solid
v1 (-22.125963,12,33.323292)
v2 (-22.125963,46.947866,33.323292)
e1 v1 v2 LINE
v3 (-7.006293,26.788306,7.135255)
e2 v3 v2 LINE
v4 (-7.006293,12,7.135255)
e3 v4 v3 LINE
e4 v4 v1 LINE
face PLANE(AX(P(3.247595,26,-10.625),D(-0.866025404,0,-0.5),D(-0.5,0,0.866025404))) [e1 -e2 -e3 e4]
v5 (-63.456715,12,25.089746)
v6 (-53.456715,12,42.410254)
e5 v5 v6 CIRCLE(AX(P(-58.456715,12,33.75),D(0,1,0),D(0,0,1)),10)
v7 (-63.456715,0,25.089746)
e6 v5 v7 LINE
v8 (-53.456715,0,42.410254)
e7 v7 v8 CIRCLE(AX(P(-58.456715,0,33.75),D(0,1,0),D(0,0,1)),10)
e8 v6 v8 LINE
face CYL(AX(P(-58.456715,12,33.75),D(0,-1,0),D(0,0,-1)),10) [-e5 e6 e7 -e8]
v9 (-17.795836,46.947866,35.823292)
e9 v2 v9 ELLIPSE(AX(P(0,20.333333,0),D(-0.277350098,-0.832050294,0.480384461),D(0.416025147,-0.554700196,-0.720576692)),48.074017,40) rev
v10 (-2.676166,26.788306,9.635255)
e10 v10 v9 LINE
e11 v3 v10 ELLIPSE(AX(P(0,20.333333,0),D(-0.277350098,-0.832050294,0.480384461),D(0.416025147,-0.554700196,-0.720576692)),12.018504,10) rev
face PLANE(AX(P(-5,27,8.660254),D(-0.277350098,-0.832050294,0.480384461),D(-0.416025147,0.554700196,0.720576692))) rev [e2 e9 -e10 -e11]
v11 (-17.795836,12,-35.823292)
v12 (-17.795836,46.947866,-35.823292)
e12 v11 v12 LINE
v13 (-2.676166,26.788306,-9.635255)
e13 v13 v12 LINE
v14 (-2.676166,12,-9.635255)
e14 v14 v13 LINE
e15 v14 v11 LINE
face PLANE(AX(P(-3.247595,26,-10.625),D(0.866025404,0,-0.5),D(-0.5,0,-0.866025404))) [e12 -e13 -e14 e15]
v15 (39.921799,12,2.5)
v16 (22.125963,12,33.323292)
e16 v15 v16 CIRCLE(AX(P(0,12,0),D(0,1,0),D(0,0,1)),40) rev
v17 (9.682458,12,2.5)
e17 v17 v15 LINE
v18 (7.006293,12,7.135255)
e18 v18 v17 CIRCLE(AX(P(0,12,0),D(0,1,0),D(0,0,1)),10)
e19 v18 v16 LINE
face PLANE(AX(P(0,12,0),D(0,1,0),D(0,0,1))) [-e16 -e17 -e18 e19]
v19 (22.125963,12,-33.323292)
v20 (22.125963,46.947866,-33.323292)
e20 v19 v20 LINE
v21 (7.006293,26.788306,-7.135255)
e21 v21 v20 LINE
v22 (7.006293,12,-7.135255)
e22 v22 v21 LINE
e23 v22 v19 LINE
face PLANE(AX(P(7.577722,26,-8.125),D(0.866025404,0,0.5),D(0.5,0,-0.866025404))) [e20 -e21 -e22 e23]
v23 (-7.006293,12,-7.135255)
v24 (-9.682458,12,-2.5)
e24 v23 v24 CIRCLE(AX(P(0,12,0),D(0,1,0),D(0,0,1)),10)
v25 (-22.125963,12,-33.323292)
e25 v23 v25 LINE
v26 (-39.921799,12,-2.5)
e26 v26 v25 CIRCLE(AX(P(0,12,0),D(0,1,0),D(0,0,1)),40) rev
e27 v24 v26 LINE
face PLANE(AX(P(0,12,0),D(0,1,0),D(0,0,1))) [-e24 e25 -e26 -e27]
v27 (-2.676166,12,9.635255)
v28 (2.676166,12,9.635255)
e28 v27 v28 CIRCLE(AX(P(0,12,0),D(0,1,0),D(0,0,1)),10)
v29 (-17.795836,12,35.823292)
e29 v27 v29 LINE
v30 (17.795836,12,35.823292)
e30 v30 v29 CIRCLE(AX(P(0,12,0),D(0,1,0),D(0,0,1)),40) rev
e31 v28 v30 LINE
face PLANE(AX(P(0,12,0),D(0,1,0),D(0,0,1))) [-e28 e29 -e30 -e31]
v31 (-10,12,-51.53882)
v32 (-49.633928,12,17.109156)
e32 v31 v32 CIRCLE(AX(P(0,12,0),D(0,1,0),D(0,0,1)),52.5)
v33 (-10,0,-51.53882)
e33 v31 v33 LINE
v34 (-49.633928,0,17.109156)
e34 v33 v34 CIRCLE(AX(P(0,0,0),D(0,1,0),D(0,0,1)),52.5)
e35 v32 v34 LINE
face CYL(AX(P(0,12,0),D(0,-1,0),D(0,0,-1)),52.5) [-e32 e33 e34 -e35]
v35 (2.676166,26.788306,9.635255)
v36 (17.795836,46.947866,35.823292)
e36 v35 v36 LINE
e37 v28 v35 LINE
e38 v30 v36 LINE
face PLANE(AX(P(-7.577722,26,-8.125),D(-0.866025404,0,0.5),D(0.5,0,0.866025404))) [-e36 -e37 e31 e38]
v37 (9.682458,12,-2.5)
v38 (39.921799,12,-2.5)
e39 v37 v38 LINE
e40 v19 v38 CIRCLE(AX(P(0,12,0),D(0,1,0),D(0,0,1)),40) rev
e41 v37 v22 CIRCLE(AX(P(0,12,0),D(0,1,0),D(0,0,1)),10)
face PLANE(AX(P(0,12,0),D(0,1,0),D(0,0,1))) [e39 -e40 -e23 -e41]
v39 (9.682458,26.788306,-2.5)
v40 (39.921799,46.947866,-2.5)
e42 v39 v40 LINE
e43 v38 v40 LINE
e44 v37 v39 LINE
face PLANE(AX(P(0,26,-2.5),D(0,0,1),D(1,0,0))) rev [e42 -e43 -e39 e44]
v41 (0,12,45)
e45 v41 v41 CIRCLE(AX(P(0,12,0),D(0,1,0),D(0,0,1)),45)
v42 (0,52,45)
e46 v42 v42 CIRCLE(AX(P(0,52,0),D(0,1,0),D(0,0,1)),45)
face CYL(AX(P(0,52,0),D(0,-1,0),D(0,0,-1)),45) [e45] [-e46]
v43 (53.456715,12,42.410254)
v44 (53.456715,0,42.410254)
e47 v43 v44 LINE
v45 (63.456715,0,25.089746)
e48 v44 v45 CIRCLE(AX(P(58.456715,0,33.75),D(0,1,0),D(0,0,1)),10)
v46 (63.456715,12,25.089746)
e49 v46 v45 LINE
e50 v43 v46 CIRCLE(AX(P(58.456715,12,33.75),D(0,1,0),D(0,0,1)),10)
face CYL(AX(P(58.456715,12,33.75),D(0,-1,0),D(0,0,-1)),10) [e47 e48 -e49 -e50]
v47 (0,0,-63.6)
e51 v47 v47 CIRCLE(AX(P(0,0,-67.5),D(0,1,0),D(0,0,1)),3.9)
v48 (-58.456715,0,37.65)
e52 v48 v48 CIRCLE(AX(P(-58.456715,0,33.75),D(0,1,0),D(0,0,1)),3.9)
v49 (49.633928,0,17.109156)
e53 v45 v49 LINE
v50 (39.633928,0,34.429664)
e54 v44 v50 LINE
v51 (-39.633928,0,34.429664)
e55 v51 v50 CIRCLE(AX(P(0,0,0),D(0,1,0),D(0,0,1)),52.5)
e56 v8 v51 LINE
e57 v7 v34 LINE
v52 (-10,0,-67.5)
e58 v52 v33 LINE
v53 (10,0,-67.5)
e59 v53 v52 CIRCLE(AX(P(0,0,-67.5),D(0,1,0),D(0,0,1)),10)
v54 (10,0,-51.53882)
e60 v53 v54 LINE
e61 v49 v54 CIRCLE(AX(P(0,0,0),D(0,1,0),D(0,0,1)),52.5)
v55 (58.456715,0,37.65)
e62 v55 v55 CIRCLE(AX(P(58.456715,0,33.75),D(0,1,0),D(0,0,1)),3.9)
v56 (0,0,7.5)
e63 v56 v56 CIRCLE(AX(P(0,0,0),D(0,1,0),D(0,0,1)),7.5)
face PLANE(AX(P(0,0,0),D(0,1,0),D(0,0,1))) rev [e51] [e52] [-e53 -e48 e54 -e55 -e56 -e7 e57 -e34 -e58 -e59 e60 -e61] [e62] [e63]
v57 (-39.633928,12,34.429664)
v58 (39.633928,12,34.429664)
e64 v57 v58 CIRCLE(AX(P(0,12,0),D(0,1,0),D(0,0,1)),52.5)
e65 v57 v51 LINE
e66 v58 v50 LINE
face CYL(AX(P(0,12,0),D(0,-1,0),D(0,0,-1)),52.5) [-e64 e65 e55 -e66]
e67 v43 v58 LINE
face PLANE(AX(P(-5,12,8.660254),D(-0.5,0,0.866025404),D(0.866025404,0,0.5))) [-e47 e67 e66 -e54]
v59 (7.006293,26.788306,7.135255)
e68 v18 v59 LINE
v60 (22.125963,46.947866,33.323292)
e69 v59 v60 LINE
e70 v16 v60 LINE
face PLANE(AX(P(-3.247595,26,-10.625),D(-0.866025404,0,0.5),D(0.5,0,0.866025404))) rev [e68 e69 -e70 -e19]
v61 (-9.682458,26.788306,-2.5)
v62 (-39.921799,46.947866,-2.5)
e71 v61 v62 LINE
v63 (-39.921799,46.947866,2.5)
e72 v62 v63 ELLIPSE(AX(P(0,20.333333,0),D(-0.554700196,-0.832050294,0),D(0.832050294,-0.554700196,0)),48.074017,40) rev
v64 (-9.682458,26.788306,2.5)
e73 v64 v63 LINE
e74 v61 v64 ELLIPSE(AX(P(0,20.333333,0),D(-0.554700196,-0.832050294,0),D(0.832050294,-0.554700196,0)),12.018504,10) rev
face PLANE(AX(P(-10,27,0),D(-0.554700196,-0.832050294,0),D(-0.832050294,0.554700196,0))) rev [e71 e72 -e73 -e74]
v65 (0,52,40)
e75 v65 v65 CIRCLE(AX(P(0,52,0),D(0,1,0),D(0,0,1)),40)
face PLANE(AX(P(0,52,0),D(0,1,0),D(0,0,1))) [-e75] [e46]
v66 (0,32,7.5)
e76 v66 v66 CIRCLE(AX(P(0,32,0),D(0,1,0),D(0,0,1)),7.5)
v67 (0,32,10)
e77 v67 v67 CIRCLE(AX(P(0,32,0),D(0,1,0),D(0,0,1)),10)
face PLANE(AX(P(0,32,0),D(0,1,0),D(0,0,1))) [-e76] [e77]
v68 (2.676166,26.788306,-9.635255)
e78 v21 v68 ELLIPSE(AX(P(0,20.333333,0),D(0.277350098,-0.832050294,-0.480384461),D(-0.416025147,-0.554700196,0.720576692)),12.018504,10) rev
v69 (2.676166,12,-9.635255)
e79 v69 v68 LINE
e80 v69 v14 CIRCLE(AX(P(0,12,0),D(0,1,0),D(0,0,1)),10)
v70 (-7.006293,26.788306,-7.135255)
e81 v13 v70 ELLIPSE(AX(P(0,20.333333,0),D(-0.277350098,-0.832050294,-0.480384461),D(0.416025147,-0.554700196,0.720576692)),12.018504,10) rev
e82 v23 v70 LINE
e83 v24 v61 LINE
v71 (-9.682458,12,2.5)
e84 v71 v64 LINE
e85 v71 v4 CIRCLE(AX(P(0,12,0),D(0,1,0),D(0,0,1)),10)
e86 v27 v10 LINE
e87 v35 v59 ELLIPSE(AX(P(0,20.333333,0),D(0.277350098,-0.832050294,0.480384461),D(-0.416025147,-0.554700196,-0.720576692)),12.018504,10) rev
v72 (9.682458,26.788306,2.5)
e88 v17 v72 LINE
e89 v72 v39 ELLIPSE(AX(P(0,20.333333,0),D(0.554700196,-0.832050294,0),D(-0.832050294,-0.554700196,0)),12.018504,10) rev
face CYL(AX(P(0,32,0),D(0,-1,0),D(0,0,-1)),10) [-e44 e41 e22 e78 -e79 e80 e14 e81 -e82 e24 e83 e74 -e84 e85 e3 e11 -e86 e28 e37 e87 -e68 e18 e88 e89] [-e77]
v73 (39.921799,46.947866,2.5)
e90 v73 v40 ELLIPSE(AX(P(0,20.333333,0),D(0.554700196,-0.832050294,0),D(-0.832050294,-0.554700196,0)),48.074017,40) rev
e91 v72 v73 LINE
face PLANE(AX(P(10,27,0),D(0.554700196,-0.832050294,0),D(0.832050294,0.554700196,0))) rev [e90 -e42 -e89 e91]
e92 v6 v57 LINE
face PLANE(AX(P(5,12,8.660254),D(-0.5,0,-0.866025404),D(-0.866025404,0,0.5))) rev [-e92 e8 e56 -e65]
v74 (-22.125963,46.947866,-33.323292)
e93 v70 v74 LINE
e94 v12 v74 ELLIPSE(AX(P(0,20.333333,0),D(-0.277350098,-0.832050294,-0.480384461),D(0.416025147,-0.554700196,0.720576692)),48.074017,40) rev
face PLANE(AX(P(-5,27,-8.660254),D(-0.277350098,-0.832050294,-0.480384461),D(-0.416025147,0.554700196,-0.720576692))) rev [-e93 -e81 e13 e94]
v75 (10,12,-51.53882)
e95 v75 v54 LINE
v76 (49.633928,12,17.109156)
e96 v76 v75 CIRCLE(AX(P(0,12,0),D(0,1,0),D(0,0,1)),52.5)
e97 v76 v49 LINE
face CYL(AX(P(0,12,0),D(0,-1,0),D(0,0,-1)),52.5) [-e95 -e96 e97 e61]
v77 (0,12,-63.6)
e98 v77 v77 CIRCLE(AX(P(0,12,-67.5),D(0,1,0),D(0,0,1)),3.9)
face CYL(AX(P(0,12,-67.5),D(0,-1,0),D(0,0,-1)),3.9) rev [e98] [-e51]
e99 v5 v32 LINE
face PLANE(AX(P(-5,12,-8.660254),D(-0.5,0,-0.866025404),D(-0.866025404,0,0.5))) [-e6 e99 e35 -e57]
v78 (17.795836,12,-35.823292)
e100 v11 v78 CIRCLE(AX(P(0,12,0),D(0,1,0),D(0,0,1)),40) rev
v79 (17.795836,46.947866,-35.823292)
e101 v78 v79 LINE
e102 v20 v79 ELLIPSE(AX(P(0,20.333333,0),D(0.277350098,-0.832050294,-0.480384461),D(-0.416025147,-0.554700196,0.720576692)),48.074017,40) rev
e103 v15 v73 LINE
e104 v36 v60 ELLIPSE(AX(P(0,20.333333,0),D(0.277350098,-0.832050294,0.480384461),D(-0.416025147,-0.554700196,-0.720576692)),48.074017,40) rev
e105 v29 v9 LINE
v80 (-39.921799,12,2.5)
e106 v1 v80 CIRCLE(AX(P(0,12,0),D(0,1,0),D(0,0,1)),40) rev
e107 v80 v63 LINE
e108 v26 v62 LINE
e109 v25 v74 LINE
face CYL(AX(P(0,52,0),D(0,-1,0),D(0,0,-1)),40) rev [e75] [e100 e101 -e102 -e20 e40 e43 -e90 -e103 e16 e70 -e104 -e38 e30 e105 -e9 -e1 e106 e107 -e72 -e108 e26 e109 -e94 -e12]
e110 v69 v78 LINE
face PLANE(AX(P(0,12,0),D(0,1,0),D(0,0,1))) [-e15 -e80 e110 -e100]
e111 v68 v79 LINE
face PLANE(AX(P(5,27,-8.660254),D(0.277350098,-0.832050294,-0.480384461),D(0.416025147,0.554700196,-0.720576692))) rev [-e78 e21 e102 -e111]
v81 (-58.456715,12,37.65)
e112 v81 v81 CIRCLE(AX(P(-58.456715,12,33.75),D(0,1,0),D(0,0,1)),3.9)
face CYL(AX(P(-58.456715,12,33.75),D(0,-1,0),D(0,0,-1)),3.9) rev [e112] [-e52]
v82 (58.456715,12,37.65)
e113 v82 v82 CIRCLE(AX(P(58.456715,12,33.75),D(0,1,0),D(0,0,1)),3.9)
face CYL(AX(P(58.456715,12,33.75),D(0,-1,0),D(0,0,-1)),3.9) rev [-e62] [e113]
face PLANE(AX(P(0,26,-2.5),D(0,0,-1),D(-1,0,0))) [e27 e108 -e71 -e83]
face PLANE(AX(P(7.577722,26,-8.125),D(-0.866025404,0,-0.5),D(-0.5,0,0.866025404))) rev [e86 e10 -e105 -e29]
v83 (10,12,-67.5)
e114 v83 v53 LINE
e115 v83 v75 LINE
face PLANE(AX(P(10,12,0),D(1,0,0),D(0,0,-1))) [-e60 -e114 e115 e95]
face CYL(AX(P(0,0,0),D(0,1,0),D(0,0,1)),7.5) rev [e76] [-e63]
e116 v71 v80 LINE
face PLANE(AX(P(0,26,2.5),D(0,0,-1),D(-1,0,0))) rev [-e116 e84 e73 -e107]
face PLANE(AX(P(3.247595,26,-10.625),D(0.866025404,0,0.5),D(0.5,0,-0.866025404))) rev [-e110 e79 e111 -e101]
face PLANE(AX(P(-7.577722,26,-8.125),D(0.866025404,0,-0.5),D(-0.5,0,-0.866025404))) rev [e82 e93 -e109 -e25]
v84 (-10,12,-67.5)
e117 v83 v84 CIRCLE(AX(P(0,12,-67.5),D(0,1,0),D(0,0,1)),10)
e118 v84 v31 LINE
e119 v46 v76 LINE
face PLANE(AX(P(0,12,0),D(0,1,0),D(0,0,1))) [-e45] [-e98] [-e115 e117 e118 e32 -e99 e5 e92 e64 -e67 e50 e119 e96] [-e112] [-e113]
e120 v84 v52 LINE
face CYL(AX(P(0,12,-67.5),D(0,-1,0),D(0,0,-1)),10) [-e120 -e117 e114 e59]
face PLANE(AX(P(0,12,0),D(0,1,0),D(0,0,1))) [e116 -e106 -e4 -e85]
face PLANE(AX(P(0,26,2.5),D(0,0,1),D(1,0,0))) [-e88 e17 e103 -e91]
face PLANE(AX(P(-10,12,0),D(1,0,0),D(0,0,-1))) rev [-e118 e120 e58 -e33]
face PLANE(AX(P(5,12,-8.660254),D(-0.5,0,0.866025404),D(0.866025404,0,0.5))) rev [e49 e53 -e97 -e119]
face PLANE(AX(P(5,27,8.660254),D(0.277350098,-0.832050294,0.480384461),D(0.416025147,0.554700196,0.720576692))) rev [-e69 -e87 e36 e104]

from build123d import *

# Parameters (mm, degrees)
SKETCH1_R           = 3.9
BOSS_EXTRUDE1_DEPTH = 12
SKETCH2_R           = 7.5
CUT_EXTRUDE1_DEPTH  = 12
BOSS_EXTRUDE2_START = 20
SKETCH4_R           = 10
SKETCH4_R_2         = 7.5
BOSS_EXTRUDE2_DEPTH = 20
SKETCH5_R           = 45
SKETCH5_R_2         = 40
BOSS_EXTRUDE3_DEPTH = 40
RIB1_REACH          = 117.744
SKETCH6_WALL_W      = 269.542633736
SKETCH6_WALL_H      = 5
CIRPATTERN1_COUNT   = 6


with BuildPart() as part:
    # Sketch1 → Boss-Extrude1 (new body)
    with BuildSketch(Plane(origin=(0, 0, 0), x_dir=(1, 0, 0), z_dir=(0, 1, 0))):
        with BuildLine():
            ThreePointArc((10, 67.5), (0, 77.5), (-10, 67.5))
            Line((-10, 67.5), (-10, 51.53882032))
            ThreePointArc((-10, 51.53882032), (-45.466333699, 26.25), (-49.633927678, -17.109156122))
            Line((-49.633927678, -17.109156122), (-63.456714755, -25.089745962))
            ThreePointArc((-63.456714755, -25.089745962), (-67.116968793, -38.75), (-53.456714755, -42.410254038))
            Line((-53.456714755, -42.410254038), (-39.633927678, -34.429664198))
            ThreePointArc((-39.633927678, -34.429664198), (0, -52.5), (39.633927678, -34.429664198))
            Line((39.633927678, -34.429664198), (53.456714755, -42.410254038))
            ThreePointArc((53.456714755, -42.410254038), (67.116968793, -38.75), (63.456714755, -25.089745962))
            Line((63.456714755, -25.089745962), (49.633927678, -17.109156122))
            ThreePointArc((49.633927678, -17.109156122), (45.466333699, 26.25), (10, 51.53882032))
            Line((10, 51.53882032), (10, 67.5))
        make_face()
        with Locations((-58.456714755, -33.75)):
            Circle(SKETCH1_R, mode=Mode.SUBTRACT)
        with Locations((58.456714755, -33.75)):
            Circle(SKETCH1_R, mode=Mode.SUBTRACT)
        with Locations((0, 67.5)):
            Circle(SKETCH1_R, mode=Mode.SUBTRACT)
    extrude(amount=BOSS_EXTRUDE1_DEPTH)

    # Sketch2 → Cut-Extrude1 (cut)
    with BuildSketch(Plane(origin=(0, 12, 0), x_dir=(1, 0, 0), z_dir=(0, 1, 0))):
        Circle(SKETCH2_R)
    extrude(amount=-CUT_EXTRUDE1_DEPTH, mode=Mode.SUBTRACT)

    # Sketch4 → Boss-Extrude2 (add)
    with BuildSketch(Plane(origin=(0, 12, 0), x_dir=(1, 0, 0), z_dir=(0, 1, 0)).offset(BOSS_EXTRUDE2_START)):
        Circle(SKETCH4_R)
        Circle(SKETCH4_R_2, mode=Mode.SUBTRACT)
    extrude(amount=-BOSS_EXTRUDE2_DEPTH)

    # Sketch5 → Boss-Extrude3 (add)
    with BuildSketch(Plane(origin=(0, 12, 0), x_dir=(1, 0, 0), z_dir=(0, 1, 0))):
        Circle(SKETCH5_R)
        Circle(SKETCH5_R_2, mode=Mode.SUBTRACT)
    extrude(amount=BOSS_EXTRUDE3_DEPTH)

    # Sketch6 wall → Rib1 (add, up to next)
    with BuildSketch(Plane(origin=(25, 37, 0), x_dir=(0.832050294338, 0.554700196225, 0), z_dir=(-0.554700196225, 0.832050294338, 0)), mode=Mode.PRIVATE) as rib1_sk1:
        Rectangle(SKETCH6_WALL_W, SKETCH6_WALL_H)
    rib1_tool1 = extrude(rib1_sk1.sketch, amount=-RIB1_REACH, mode=Mode.PRIVATE) - part.part
    rib1 = rib1_tool1.solids().sort_by_distance((25, 37, 0))[0]
    add(rib1)

    # CirPattern1: Rib1 ×6 about axis
    cirpattern1_axis = Axis((0, 0, 0), (0, 1, 0))
    for i in range(1, CIRPATTERN1_COUNT):
        add(rib1.rotate(cirpattern1_axis, i * 360 / CIRPATTERN1_COUNT))


solid = part.part
